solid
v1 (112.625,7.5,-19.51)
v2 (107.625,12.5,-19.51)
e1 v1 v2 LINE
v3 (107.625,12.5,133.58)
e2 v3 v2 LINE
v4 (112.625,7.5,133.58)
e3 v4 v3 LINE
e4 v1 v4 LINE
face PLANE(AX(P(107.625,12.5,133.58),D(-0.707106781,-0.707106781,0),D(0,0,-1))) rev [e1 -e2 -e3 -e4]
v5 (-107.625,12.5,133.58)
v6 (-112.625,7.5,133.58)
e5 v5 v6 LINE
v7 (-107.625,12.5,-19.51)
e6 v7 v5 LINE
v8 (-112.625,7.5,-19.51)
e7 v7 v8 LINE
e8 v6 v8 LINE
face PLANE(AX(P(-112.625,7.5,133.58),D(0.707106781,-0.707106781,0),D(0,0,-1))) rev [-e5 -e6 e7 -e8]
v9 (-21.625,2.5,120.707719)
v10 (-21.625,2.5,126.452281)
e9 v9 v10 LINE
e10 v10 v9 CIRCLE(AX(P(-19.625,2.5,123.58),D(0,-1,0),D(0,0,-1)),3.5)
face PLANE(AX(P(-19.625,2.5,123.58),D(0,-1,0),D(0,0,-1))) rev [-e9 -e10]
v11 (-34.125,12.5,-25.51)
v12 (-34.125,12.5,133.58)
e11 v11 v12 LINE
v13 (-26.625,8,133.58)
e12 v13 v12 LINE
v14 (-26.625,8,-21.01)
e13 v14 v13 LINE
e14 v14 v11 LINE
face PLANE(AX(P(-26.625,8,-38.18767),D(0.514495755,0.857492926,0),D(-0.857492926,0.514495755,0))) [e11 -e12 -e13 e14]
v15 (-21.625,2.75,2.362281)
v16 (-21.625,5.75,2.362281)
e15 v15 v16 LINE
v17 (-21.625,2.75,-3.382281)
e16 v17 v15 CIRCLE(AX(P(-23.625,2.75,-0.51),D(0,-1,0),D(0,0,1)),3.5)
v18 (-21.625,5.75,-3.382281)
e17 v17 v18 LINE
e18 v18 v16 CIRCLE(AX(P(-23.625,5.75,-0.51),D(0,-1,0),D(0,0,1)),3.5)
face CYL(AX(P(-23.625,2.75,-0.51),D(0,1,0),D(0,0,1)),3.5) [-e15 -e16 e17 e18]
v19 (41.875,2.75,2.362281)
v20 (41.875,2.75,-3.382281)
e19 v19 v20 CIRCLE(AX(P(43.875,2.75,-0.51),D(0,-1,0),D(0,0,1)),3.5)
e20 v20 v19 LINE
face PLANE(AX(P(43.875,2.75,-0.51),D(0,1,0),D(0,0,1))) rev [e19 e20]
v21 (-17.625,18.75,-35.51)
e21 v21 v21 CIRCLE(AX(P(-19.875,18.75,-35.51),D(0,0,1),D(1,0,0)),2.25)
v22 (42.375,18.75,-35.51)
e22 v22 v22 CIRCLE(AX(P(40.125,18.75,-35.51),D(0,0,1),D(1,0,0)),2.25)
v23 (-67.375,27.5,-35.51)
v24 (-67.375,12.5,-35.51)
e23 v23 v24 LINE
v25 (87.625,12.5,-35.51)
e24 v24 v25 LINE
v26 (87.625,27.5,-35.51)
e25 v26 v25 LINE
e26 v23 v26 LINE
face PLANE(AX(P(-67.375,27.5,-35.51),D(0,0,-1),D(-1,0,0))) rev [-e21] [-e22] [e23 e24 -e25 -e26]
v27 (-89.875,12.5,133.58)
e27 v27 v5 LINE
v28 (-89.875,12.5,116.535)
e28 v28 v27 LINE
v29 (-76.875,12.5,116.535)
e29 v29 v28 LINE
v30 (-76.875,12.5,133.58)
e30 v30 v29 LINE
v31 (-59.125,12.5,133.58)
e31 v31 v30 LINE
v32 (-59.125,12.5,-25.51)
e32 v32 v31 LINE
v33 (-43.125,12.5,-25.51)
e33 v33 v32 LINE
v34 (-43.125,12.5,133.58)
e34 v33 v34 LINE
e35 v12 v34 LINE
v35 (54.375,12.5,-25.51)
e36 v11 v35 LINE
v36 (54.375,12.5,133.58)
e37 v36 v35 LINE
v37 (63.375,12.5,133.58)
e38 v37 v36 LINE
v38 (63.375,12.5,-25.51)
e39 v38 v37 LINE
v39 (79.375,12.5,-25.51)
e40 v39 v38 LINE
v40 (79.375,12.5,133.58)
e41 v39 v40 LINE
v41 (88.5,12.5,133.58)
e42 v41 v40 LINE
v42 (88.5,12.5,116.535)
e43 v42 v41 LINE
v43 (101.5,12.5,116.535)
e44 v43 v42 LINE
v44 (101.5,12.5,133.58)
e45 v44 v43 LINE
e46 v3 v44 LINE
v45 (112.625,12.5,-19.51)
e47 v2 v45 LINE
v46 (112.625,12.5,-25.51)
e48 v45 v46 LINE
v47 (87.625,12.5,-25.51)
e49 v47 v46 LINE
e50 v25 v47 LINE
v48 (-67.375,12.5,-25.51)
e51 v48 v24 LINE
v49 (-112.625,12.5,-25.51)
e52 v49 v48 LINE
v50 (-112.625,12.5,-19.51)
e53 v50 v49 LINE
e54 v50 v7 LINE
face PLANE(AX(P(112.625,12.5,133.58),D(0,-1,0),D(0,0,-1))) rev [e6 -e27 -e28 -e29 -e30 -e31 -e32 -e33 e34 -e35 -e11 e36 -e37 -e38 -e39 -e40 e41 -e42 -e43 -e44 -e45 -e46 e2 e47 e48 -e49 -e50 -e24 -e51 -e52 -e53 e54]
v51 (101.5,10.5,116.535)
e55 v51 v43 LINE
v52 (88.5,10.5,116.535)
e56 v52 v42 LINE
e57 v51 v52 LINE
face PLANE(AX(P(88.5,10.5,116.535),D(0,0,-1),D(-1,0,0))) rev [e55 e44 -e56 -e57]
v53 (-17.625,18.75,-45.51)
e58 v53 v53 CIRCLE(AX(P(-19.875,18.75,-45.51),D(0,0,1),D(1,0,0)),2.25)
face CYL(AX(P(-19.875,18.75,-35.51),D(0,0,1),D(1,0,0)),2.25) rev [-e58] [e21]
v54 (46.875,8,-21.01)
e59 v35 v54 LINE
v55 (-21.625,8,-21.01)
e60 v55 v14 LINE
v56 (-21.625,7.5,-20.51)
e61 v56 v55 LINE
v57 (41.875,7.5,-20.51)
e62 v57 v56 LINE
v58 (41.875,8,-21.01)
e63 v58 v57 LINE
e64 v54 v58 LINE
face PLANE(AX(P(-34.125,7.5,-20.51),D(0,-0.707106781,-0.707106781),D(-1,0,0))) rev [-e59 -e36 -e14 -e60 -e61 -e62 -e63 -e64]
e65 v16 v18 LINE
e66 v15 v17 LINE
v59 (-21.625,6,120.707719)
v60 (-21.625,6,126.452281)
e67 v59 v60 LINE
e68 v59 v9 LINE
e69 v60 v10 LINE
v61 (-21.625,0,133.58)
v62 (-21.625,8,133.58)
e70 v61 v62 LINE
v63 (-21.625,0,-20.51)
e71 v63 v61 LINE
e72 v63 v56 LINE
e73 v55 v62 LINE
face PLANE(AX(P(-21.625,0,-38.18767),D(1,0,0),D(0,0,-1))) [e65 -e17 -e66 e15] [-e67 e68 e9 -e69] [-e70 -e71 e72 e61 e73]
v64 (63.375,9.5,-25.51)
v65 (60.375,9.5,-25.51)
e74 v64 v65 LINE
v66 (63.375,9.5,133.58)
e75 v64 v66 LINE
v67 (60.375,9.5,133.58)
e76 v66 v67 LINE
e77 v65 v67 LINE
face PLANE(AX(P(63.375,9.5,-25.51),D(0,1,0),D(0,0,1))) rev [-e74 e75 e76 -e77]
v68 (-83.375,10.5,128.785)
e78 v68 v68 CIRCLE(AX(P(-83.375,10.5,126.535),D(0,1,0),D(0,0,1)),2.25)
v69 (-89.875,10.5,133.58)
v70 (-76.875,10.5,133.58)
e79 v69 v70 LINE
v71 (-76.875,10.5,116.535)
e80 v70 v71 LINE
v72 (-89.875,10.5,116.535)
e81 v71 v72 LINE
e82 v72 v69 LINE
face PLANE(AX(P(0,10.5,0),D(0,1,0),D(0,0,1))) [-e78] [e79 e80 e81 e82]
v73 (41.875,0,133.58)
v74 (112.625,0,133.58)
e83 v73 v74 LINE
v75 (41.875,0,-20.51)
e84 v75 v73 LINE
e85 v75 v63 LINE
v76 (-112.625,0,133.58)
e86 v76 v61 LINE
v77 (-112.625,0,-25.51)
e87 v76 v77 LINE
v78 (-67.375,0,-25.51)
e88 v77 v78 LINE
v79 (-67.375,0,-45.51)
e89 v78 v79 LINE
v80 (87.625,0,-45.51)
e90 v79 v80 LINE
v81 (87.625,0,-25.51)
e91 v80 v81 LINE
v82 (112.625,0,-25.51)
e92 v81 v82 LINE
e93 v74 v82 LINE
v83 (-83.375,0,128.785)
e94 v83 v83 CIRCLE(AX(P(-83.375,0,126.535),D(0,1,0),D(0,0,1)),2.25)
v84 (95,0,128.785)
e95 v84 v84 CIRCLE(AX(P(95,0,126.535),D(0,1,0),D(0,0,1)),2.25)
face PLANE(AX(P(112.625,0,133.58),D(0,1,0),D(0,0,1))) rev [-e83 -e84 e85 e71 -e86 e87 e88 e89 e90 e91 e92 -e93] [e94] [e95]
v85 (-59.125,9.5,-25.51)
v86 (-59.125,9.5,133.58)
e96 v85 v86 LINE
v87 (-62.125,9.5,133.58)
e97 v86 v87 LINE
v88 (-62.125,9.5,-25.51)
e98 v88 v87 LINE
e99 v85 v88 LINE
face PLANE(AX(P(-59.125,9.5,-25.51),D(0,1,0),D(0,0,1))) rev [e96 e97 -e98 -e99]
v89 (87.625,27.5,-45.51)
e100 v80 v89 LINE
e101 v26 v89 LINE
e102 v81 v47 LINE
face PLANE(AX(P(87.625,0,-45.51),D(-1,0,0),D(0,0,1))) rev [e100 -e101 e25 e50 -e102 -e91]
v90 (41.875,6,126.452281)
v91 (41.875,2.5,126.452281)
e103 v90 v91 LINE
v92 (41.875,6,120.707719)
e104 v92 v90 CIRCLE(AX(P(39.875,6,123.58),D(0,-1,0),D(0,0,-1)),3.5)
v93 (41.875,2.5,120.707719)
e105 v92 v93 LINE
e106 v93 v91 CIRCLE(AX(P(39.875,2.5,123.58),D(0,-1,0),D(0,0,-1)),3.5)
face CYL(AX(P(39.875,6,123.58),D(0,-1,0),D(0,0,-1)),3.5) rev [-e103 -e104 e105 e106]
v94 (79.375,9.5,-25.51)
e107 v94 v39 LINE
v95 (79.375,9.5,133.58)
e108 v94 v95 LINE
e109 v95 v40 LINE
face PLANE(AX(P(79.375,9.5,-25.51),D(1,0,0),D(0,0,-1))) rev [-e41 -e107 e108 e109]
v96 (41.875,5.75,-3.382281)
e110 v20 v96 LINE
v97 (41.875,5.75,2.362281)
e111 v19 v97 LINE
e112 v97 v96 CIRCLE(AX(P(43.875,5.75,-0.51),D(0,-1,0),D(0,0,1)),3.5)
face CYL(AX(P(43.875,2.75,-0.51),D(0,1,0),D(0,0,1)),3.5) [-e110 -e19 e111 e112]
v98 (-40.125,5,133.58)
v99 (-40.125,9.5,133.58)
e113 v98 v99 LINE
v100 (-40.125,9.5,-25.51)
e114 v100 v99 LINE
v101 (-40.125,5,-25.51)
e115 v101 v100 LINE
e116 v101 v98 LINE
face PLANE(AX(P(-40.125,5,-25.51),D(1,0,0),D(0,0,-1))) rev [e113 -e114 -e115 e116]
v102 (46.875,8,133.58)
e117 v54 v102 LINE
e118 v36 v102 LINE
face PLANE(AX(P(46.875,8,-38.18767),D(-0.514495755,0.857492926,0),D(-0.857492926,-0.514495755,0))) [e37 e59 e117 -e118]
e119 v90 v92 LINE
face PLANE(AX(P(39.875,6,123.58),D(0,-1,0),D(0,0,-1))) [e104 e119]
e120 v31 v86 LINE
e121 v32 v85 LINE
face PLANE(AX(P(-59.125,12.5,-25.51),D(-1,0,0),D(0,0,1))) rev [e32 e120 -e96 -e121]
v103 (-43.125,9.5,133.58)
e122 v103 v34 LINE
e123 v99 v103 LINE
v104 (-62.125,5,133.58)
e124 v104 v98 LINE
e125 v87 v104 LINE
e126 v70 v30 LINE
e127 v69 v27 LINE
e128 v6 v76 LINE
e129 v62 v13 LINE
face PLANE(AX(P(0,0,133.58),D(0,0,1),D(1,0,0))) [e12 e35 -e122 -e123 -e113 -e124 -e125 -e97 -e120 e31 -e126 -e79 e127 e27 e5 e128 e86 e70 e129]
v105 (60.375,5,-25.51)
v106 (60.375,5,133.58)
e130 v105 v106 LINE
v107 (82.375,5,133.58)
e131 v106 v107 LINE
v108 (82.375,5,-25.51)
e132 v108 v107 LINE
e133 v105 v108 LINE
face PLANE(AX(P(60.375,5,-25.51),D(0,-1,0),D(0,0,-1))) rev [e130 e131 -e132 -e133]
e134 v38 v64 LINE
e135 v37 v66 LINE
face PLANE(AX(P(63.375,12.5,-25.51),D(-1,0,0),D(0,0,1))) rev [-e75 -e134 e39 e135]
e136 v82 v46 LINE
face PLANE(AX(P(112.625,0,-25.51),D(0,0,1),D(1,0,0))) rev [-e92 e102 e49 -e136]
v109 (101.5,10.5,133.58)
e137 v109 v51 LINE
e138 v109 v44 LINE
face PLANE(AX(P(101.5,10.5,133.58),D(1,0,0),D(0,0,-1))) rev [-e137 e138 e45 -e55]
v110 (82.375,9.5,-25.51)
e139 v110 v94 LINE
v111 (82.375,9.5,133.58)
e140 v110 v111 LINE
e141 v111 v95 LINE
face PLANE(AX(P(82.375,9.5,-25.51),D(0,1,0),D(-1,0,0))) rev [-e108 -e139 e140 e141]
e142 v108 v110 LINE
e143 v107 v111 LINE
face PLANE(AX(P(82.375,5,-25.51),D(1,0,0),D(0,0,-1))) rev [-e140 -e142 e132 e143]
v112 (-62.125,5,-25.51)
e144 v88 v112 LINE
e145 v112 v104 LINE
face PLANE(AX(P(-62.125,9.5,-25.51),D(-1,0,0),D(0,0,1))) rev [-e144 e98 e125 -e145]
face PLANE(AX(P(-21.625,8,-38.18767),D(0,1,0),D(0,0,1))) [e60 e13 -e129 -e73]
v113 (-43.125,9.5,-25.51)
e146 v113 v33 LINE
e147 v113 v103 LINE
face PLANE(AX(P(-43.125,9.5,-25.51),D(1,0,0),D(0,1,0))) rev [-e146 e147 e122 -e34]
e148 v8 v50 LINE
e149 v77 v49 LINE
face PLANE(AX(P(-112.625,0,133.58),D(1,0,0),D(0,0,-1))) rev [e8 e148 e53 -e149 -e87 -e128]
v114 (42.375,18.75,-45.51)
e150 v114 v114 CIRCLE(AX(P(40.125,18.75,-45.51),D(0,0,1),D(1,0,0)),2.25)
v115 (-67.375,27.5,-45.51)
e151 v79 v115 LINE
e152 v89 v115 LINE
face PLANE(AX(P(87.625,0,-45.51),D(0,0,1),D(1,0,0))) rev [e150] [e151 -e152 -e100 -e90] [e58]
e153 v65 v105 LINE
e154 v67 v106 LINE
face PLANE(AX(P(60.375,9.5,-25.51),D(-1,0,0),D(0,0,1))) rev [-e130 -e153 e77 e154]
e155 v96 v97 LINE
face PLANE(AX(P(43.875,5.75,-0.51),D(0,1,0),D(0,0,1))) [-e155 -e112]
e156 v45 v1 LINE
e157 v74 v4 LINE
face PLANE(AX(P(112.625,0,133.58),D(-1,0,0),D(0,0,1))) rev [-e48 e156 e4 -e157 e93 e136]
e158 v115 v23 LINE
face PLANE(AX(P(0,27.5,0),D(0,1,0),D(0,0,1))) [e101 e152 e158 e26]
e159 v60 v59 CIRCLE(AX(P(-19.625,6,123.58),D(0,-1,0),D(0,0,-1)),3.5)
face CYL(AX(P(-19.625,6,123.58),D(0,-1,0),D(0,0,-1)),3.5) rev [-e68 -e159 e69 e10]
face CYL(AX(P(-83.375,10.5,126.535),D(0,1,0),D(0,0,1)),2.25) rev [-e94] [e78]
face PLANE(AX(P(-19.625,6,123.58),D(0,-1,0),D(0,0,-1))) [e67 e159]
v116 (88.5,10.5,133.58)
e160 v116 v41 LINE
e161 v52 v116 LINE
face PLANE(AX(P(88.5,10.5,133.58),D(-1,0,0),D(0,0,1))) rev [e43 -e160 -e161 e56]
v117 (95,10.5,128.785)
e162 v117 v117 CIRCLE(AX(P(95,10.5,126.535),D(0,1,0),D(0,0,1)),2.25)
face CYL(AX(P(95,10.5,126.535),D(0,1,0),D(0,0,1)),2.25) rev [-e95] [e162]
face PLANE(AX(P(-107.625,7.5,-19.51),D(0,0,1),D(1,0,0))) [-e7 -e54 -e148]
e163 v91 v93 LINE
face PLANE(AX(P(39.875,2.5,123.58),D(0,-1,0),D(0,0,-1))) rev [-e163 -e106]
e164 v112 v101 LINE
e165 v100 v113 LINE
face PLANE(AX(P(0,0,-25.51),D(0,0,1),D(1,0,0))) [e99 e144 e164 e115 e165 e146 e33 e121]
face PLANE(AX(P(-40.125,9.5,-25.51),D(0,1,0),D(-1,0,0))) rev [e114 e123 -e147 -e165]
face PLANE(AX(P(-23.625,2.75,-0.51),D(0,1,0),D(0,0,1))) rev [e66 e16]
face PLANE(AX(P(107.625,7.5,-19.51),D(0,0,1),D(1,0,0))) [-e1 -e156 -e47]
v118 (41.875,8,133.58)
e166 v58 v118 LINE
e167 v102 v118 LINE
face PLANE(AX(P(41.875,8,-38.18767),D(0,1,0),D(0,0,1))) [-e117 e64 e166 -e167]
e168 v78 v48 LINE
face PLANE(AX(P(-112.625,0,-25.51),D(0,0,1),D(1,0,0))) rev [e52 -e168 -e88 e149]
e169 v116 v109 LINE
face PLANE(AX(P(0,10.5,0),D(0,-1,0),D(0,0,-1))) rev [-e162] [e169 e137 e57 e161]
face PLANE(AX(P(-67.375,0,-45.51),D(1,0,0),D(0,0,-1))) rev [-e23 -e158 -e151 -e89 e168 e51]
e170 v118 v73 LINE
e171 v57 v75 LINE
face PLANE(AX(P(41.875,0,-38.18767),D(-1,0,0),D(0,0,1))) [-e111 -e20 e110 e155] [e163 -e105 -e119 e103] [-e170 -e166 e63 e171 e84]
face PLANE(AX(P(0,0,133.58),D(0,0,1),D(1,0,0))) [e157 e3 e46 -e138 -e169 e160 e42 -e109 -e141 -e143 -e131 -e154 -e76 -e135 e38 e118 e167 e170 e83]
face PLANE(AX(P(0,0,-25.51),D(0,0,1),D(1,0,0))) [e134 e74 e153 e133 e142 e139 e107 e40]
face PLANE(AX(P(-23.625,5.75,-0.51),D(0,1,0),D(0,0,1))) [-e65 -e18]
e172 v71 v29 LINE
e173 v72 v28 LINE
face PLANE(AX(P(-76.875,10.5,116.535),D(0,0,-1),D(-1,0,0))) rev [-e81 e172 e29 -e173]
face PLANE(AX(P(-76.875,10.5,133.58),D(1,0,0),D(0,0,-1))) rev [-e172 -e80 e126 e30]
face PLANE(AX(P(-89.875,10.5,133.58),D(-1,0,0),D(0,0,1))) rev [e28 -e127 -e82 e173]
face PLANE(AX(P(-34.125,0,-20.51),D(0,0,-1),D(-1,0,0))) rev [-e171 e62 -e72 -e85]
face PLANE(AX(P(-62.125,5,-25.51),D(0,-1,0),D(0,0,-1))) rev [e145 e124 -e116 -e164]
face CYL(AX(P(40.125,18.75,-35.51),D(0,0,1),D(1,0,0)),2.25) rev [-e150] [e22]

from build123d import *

# Parameters (mm, degrees)
SKETCH1_W            = 225.25
SKETCH1_H            = 12.5
BOSS_EXTRUDE1_DEPTH  = 133.58
CUT_EXTRUDE1_DEPTH   = 159.09
SKETCH11_W           = 88.5
SKETCH11_H           = 154.09
CUT_EXTRUDE2_DEPTH   = 176.169223966
SKETCH12_W           = 13
SKETCH12_H           = 17.045
CUT_EXTRUDE3_DEPTH   = 2
M4_CLEARANCE_HOLE1_D = 4.5
BOSS_EXTRUDE3_DEPTH  = 154.09
CHAMFER4_START       = -19.51
CHAMFER4_DEPTH       = 154.51
CHAMFER5_START       = -19.51
CHAMFER5_DEPTH       = 154.51
CUT_EXTRUDE4_DEPTH   = 1.75
BOSS_EXTRUDE4_DEPTH  = 1.5
CUT_EXTRUDE5_DEPTH   = 176.169223966
CHAMFER6_SIZE        = 5
SKETCH19_W           = 155
SKETCH19_H           = 10
BOSS_EXTRUDE5_DEPTH  = 15
M4_CLEARANCE_HOLE2_D = 4.5


with BuildPart() as part:
    # Sketch1 → Boss-Extrude1 (new, symmetric)
    with BuildSketch(Plane.XY):
        with Locations((0, 6.25)):
            Rectangle(SKETCH1_W, SKETCH1_H)
    extrude(amount=BOSS_EXTRUDE1_DEPTH, both=True)

    # Sketch4 → Cut-Extrude1 (cut)
    with BuildSketch(Plane.XY.offset(133.58)):
        Polygon((-59.125, 12.5), (-59.125, 9.5), (-62.125, 9.5), (-62.125, 5), (-40.125, 5), (-40.125, 9.5), (-43.125, 9.5), (-43.125, 12.5), align=None)
        Polygon((63.375, 12.5), (63.375, 9.5), (60.375, 9.5), (60.375, 5), (82.375, 5), (82.375, 9.5), (79.375, 9.5), (79.375, 12.5), align=None)
    extrude(amount=-CUT_EXTRUDE1_DEPTH, mode=Mode.SUBTRACT)

    # Sketch11 → Cut-Extrude2 (cut, through all)
    with BuildSketch(Plane(origin=(0, 12.5, 0), x_dir=(1, 0, 0), z_dir=(0, 1, 0))):
        with Locations((10.125, -56.535)):
            Rectangle(SKETCH11_W, SKETCH11_H)
    extrude(amount=-CUT_EXTRUDE2_DEPTH, mode=Mode.SUBTRACT)

    # Sketch12 → Cut-Extrude3 (cut)
    with BuildSketch(Plane(origin=(0, 12.5, 0), x_dir=(1, 0, 0), z_dir=(0, 1, 0))):
        with Locations((-83.375, -125.0575)):
            Rectangle(SKETCH12_W, SKETCH12_H)
        with Locations((95, -125.0575)):
            Rectangle(SKETCH12_W, SKETCH12_H)
    extrude(amount=-CUT_EXTRUDE3_DEPTH, mode=Mode.SUBTRACT)

    # M4 Clearance Hole1 (through all)
    with Locations(Plane(origin=(0, 10.5, 0), x_dir=(1, 0, 0), z_dir=(0, 1, 0))):
        with Locations((-83.375, -126.535), (95, -126.535)):
            Hole(M4_CLEARANCE_HOLE1_D / 2)

    # Sketch15 → Boss-Extrude3 (add)
    with BuildSketch(Plane.XY.offset(133.58)):
        Polygon((-34.125, 0), (-21.625, 0), (-21.625, 8), (-26.625, 8), (-34.125, 12.5), align=None)
        Polygon((54.375, 0), (41.875, 0), (41.875, 8), (46.875, 8), (54.375, 12.5), align=None)
    extrude(amount=-BOSS_EXTRUDE3_DEPTH)

    # Chamfer4: read off the stored shape, not the designer's step
    # Chamfer4 outline → Chamfer4 (cut)
    with BuildSketch(Plane.XY.offset(CHAMFER4_START)):
        Polygon((-112.625, 12.5), (-112.625, 7.5), (-107.625, 12.5), align=None)
    extrude(amount=CHAMFER4_DEPTH, mode=Mode.SUBTRACT)

    # Chamfer5: read off the stored shape, not the designer's step
    # Chamfer5 outline → Chamfer5 (cut)
    with BuildSketch(Plane.XY.offset(CHAMFER5_START)):
        Polygon((112.625, 12.5), (107.625, 12.5), (112.625, 7.5), align=None)
    extrude(amount=CHAMFER5_DEPTH, mode=Mode.SUBTRACT)

    # Sketch16 → Cut-Extrude4 (cut, symmetric)
    with BuildSketch(Plane(origin=(0, 4.25, 0), x_dir=(-1, 0, 0), z_dir=(0, -1, 0))):
        with BuildLine():
            Line((21.625, -126.452281323), (21.625, -120.707718677))
            ThreePointArc((21.625, -120.707718677), (23.125, -123.58), (21.625, -126.452281323))
        make_face()
        with BuildLine():
            Line((-41.875, -120.707718677), (-41.875, -126.452281323))
            ThreePointArc((-41.875, -126.452281323), (-43.375, -123.58), (-41.875, -120.707718677))
        make_face()
    extrude(amount=CUT_EXTRUDE4_DEPTH, both=True, mode=Mode.SUBTRACT)

    # Sketch17 → Boss-Extrude4 (add, symmetric)
    with BuildSketch(Plane(origin=(0, 4.25, 0), x_dir=(-1, 0, 0), z_dir=(0, -1, 0))):
        with BuildLine():
            Line((-41.875, 3.382281323), (-41.875, -2.362281323))
            ThreePointArc((-41.875, -2.362281323), (-40.375, 0.51), (-41.875, 3.382281323))
        make_face()
        with BuildLine():
            Line((21.625, -2.362281323), (21.625, 3.382281323))
            ThreePointArc((21.625, 3.382281323), (20.125, 0.51), (21.625, -2.362281323))
        make_face()
    extrude(amount=BOSS_EXTRUDE4_DEPTH, both=True)

    # Sketch18 → Cut-Extrude5 (cut, through all)
    with BuildSketch(Plane(origin=(0, 12.5, 0), x_dir=(1, 0, 0), z_dir=(0, 1, 0))):
        Polygon((87.625, 45.51), (-67.375, 45.51), (-67.375, 25.51), (-112.625, 25.51), (-112.625, 133.58), (112.625, 133.58), (112.625, 25.51), (87.625, 25.51), align=None)
    extrude(amount=-CUT_EXTRUDE5_DEPTH, mode=Mode.SUBTRACT)

    # Chamfer6
    # the kernel refuses this chamfer: 5 mm, written as the material it takes off along each edge
    with BuildSketch(Plane(origin=(67.23341494, 12.5, -20.51), x_dir=(0, -1, 0), z_dir=(-1, 0, 0))) as chamfer6_piece_1_section:
        Polygon((CHAMFER6_SIZE, 0), (0, -CHAMFER6_SIZE), (0, 0), align=None)
    chamfer6_piece_1 = extrude(amount=114.21682988, mode=Mode.PRIVATE)
    chamfer6_piece_1 = split(chamfer6_piece_1, bisect_by=Plane(origin=(41.875, 12.5, -20.51), z_dir=(1, 0, 0)), keep=Keep.TOP, mode=Mode.PRIVATE)
    chamfer6_piece_1 = split(chamfer6_piece_1, bisect_by=Plane(origin=(67.23341494, 8, -20.51), z_dir=(0, 1, 0)), keep=Keep.TOP, mode=Mode.PRIVATE)
    chamfer6_piece_1 = split(chamfer6_piece_1, bisect_by=Plane(origin=(63.829716868, 18.172830121, -20.51), z_dir=(-0.514495755427524, 0.8574929257125457, 0)), keep=Keep.TOP, mode=Mode.PRIVATE)
    add(chamfer6_piece_1, mode=Mode.SUBTRACT)
    with BuildSketch(Plane(origin=(67.23341494, 12.5, -20.51), x_dir=(0, -1, 0), z_dir=(-1, 0, 0))) as chamfer6_piece_2_section:
        Polygon((CHAMFER6_SIZE, 0), (0, -CHAMFER6_SIZE), (0, 0), align=None)
    chamfer6_piece_2 = extrude(amount=114.21682988, mode=Mode.PRIVATE)
    chamfer6_piece_2 = split(chamfer6_piece_2, bisect_by=Plane(origin=(41.875, 12.5, -20.51), z_dir=(-1, 0, 0)), keep=Keep.TOP, mode=Mode.PRIVATE)
    chamfer6_piece_2 = split(chamfer6_piece_2, bisect_by=Plane(origin=(67.23341494, 8, -20.51), z_dir=(0, -1, 0)), keep=Keep.TOP, mode=Mode.PRIVATE)
    chamfer6_piece_2 = split(chamfer6_piece_2, bisect_by=Plane(origin=(-21.625, 12.5, -20.51), z_dir=(1, 0, 0)), keep=Keep.TOP, mode=Mode.PRIVATE)
    add(chamfer6_piece_2, mode=Mode.SUBTRACT)
    with BuildSketch(Plane(origin=(67.23341494, 12.5, -20.51), x_dir=(0, -1, 0), z_dir=(-1, 0, 0))) as chamfer6_piece_3_section:
        Polygon((CHAMFER6_SIZE, 0), (0, -CHAMFER6_SIZE), (0, 0), align=None)
    chamfer6_piece_3 = extrude(amount=114.21682988, mode=Mode.PRIVATE)
    chamfer6_piece_3 = split(chamfer6_piece_3, bisect_by=Plane(origin=(41.875, 12.5, -20.51), z_dir=(-1, 0, 0)), keep=Keep.TOP, mode=Mode.PRIVATE)
    chamfer6_piece_3 = split(chamfer6_piece_3, bisect_by=Plane(origin=(67.23341494, 8, -20.51), z_dir=(0, 1, 0)), keep=Keep.TOP, mode=Mode.PRIVATE)
    chamfer6_piece_3 = split(chamfer6_piece_3, bisect_by=Plane(origin=(-21.625, 12.5, -20.51), z_dir=(1, 0, 0)), keep=Keep.TOP, mode=Mode.PRIVATE)
    add(chamfer6_piece_3, mode=Mode.SUBTRACT)
    with BuildSketch(Plane(origin=(67.23341494, 12.5, -20.51), x_dir=(0, -1, 0), z_dir=(-1, 0, 0))) as chamfer6_piece_4_section:
        Polygon((CHAMFER6_SIZE, 0), (0, -CHAMFER6_SIZE), (0, 0), align=None)
    chamfer6_piece_4 = extrude(amount=114.21682988, mode=Mode.PRIVATE)
    chamfer6_piece_4 = split(chamfer6_piece_4, bisect_by=Plane(origin=(40.403246279, -32.216947768, -20.51), z_dir=(0.5144957554275245, 0.8574929257125454, 0)), keep=Keep.TOP, mode=Mode.PRIVATE)
    chamfer6_piece_4 = split(chamfer6_piece_4, bisect_by=Plane(origin=(67.23341494, 8, -20.51), z_dir=(0, 1, 0)), keep=Keep.TOP, mode=Mode.PRIVATE)
    chamfer6_piece_4 = split(chamfer6_piece_4, bisect_by=Plane(origin=(-21.625, 12.5, -20.51), z_dir=(-1, 0, 0)), keep=Keep.TOP, mode=Mode.PRIVATE)
    add(chamfer6_piece_4, mode=Mode.SUBTRACT)

    # Sketch19 → Boss-Extrude5 (add)
    with BuildSketch(Plane(origin=(0, 12.5, 0), x_dir=(1, 0, 0), z_dir=(0, 1, 0))):
        with Locations((10.125, 40.51)):
            Rectangle(SKETCH19_W, SKETCH19_H)
    extrude(amount=BOSS_EXTRUDE5_DEPTH)

    # M4 Clearance Hole2 (through all)
    with Locations(Plane.XY.offset(-35.51)):
        with Locations((-19.875, 18.75), (40.125, 18.75)):
            Hole(M4_CLEARANCE_HOLE2_D / 2)


solid = part.part
